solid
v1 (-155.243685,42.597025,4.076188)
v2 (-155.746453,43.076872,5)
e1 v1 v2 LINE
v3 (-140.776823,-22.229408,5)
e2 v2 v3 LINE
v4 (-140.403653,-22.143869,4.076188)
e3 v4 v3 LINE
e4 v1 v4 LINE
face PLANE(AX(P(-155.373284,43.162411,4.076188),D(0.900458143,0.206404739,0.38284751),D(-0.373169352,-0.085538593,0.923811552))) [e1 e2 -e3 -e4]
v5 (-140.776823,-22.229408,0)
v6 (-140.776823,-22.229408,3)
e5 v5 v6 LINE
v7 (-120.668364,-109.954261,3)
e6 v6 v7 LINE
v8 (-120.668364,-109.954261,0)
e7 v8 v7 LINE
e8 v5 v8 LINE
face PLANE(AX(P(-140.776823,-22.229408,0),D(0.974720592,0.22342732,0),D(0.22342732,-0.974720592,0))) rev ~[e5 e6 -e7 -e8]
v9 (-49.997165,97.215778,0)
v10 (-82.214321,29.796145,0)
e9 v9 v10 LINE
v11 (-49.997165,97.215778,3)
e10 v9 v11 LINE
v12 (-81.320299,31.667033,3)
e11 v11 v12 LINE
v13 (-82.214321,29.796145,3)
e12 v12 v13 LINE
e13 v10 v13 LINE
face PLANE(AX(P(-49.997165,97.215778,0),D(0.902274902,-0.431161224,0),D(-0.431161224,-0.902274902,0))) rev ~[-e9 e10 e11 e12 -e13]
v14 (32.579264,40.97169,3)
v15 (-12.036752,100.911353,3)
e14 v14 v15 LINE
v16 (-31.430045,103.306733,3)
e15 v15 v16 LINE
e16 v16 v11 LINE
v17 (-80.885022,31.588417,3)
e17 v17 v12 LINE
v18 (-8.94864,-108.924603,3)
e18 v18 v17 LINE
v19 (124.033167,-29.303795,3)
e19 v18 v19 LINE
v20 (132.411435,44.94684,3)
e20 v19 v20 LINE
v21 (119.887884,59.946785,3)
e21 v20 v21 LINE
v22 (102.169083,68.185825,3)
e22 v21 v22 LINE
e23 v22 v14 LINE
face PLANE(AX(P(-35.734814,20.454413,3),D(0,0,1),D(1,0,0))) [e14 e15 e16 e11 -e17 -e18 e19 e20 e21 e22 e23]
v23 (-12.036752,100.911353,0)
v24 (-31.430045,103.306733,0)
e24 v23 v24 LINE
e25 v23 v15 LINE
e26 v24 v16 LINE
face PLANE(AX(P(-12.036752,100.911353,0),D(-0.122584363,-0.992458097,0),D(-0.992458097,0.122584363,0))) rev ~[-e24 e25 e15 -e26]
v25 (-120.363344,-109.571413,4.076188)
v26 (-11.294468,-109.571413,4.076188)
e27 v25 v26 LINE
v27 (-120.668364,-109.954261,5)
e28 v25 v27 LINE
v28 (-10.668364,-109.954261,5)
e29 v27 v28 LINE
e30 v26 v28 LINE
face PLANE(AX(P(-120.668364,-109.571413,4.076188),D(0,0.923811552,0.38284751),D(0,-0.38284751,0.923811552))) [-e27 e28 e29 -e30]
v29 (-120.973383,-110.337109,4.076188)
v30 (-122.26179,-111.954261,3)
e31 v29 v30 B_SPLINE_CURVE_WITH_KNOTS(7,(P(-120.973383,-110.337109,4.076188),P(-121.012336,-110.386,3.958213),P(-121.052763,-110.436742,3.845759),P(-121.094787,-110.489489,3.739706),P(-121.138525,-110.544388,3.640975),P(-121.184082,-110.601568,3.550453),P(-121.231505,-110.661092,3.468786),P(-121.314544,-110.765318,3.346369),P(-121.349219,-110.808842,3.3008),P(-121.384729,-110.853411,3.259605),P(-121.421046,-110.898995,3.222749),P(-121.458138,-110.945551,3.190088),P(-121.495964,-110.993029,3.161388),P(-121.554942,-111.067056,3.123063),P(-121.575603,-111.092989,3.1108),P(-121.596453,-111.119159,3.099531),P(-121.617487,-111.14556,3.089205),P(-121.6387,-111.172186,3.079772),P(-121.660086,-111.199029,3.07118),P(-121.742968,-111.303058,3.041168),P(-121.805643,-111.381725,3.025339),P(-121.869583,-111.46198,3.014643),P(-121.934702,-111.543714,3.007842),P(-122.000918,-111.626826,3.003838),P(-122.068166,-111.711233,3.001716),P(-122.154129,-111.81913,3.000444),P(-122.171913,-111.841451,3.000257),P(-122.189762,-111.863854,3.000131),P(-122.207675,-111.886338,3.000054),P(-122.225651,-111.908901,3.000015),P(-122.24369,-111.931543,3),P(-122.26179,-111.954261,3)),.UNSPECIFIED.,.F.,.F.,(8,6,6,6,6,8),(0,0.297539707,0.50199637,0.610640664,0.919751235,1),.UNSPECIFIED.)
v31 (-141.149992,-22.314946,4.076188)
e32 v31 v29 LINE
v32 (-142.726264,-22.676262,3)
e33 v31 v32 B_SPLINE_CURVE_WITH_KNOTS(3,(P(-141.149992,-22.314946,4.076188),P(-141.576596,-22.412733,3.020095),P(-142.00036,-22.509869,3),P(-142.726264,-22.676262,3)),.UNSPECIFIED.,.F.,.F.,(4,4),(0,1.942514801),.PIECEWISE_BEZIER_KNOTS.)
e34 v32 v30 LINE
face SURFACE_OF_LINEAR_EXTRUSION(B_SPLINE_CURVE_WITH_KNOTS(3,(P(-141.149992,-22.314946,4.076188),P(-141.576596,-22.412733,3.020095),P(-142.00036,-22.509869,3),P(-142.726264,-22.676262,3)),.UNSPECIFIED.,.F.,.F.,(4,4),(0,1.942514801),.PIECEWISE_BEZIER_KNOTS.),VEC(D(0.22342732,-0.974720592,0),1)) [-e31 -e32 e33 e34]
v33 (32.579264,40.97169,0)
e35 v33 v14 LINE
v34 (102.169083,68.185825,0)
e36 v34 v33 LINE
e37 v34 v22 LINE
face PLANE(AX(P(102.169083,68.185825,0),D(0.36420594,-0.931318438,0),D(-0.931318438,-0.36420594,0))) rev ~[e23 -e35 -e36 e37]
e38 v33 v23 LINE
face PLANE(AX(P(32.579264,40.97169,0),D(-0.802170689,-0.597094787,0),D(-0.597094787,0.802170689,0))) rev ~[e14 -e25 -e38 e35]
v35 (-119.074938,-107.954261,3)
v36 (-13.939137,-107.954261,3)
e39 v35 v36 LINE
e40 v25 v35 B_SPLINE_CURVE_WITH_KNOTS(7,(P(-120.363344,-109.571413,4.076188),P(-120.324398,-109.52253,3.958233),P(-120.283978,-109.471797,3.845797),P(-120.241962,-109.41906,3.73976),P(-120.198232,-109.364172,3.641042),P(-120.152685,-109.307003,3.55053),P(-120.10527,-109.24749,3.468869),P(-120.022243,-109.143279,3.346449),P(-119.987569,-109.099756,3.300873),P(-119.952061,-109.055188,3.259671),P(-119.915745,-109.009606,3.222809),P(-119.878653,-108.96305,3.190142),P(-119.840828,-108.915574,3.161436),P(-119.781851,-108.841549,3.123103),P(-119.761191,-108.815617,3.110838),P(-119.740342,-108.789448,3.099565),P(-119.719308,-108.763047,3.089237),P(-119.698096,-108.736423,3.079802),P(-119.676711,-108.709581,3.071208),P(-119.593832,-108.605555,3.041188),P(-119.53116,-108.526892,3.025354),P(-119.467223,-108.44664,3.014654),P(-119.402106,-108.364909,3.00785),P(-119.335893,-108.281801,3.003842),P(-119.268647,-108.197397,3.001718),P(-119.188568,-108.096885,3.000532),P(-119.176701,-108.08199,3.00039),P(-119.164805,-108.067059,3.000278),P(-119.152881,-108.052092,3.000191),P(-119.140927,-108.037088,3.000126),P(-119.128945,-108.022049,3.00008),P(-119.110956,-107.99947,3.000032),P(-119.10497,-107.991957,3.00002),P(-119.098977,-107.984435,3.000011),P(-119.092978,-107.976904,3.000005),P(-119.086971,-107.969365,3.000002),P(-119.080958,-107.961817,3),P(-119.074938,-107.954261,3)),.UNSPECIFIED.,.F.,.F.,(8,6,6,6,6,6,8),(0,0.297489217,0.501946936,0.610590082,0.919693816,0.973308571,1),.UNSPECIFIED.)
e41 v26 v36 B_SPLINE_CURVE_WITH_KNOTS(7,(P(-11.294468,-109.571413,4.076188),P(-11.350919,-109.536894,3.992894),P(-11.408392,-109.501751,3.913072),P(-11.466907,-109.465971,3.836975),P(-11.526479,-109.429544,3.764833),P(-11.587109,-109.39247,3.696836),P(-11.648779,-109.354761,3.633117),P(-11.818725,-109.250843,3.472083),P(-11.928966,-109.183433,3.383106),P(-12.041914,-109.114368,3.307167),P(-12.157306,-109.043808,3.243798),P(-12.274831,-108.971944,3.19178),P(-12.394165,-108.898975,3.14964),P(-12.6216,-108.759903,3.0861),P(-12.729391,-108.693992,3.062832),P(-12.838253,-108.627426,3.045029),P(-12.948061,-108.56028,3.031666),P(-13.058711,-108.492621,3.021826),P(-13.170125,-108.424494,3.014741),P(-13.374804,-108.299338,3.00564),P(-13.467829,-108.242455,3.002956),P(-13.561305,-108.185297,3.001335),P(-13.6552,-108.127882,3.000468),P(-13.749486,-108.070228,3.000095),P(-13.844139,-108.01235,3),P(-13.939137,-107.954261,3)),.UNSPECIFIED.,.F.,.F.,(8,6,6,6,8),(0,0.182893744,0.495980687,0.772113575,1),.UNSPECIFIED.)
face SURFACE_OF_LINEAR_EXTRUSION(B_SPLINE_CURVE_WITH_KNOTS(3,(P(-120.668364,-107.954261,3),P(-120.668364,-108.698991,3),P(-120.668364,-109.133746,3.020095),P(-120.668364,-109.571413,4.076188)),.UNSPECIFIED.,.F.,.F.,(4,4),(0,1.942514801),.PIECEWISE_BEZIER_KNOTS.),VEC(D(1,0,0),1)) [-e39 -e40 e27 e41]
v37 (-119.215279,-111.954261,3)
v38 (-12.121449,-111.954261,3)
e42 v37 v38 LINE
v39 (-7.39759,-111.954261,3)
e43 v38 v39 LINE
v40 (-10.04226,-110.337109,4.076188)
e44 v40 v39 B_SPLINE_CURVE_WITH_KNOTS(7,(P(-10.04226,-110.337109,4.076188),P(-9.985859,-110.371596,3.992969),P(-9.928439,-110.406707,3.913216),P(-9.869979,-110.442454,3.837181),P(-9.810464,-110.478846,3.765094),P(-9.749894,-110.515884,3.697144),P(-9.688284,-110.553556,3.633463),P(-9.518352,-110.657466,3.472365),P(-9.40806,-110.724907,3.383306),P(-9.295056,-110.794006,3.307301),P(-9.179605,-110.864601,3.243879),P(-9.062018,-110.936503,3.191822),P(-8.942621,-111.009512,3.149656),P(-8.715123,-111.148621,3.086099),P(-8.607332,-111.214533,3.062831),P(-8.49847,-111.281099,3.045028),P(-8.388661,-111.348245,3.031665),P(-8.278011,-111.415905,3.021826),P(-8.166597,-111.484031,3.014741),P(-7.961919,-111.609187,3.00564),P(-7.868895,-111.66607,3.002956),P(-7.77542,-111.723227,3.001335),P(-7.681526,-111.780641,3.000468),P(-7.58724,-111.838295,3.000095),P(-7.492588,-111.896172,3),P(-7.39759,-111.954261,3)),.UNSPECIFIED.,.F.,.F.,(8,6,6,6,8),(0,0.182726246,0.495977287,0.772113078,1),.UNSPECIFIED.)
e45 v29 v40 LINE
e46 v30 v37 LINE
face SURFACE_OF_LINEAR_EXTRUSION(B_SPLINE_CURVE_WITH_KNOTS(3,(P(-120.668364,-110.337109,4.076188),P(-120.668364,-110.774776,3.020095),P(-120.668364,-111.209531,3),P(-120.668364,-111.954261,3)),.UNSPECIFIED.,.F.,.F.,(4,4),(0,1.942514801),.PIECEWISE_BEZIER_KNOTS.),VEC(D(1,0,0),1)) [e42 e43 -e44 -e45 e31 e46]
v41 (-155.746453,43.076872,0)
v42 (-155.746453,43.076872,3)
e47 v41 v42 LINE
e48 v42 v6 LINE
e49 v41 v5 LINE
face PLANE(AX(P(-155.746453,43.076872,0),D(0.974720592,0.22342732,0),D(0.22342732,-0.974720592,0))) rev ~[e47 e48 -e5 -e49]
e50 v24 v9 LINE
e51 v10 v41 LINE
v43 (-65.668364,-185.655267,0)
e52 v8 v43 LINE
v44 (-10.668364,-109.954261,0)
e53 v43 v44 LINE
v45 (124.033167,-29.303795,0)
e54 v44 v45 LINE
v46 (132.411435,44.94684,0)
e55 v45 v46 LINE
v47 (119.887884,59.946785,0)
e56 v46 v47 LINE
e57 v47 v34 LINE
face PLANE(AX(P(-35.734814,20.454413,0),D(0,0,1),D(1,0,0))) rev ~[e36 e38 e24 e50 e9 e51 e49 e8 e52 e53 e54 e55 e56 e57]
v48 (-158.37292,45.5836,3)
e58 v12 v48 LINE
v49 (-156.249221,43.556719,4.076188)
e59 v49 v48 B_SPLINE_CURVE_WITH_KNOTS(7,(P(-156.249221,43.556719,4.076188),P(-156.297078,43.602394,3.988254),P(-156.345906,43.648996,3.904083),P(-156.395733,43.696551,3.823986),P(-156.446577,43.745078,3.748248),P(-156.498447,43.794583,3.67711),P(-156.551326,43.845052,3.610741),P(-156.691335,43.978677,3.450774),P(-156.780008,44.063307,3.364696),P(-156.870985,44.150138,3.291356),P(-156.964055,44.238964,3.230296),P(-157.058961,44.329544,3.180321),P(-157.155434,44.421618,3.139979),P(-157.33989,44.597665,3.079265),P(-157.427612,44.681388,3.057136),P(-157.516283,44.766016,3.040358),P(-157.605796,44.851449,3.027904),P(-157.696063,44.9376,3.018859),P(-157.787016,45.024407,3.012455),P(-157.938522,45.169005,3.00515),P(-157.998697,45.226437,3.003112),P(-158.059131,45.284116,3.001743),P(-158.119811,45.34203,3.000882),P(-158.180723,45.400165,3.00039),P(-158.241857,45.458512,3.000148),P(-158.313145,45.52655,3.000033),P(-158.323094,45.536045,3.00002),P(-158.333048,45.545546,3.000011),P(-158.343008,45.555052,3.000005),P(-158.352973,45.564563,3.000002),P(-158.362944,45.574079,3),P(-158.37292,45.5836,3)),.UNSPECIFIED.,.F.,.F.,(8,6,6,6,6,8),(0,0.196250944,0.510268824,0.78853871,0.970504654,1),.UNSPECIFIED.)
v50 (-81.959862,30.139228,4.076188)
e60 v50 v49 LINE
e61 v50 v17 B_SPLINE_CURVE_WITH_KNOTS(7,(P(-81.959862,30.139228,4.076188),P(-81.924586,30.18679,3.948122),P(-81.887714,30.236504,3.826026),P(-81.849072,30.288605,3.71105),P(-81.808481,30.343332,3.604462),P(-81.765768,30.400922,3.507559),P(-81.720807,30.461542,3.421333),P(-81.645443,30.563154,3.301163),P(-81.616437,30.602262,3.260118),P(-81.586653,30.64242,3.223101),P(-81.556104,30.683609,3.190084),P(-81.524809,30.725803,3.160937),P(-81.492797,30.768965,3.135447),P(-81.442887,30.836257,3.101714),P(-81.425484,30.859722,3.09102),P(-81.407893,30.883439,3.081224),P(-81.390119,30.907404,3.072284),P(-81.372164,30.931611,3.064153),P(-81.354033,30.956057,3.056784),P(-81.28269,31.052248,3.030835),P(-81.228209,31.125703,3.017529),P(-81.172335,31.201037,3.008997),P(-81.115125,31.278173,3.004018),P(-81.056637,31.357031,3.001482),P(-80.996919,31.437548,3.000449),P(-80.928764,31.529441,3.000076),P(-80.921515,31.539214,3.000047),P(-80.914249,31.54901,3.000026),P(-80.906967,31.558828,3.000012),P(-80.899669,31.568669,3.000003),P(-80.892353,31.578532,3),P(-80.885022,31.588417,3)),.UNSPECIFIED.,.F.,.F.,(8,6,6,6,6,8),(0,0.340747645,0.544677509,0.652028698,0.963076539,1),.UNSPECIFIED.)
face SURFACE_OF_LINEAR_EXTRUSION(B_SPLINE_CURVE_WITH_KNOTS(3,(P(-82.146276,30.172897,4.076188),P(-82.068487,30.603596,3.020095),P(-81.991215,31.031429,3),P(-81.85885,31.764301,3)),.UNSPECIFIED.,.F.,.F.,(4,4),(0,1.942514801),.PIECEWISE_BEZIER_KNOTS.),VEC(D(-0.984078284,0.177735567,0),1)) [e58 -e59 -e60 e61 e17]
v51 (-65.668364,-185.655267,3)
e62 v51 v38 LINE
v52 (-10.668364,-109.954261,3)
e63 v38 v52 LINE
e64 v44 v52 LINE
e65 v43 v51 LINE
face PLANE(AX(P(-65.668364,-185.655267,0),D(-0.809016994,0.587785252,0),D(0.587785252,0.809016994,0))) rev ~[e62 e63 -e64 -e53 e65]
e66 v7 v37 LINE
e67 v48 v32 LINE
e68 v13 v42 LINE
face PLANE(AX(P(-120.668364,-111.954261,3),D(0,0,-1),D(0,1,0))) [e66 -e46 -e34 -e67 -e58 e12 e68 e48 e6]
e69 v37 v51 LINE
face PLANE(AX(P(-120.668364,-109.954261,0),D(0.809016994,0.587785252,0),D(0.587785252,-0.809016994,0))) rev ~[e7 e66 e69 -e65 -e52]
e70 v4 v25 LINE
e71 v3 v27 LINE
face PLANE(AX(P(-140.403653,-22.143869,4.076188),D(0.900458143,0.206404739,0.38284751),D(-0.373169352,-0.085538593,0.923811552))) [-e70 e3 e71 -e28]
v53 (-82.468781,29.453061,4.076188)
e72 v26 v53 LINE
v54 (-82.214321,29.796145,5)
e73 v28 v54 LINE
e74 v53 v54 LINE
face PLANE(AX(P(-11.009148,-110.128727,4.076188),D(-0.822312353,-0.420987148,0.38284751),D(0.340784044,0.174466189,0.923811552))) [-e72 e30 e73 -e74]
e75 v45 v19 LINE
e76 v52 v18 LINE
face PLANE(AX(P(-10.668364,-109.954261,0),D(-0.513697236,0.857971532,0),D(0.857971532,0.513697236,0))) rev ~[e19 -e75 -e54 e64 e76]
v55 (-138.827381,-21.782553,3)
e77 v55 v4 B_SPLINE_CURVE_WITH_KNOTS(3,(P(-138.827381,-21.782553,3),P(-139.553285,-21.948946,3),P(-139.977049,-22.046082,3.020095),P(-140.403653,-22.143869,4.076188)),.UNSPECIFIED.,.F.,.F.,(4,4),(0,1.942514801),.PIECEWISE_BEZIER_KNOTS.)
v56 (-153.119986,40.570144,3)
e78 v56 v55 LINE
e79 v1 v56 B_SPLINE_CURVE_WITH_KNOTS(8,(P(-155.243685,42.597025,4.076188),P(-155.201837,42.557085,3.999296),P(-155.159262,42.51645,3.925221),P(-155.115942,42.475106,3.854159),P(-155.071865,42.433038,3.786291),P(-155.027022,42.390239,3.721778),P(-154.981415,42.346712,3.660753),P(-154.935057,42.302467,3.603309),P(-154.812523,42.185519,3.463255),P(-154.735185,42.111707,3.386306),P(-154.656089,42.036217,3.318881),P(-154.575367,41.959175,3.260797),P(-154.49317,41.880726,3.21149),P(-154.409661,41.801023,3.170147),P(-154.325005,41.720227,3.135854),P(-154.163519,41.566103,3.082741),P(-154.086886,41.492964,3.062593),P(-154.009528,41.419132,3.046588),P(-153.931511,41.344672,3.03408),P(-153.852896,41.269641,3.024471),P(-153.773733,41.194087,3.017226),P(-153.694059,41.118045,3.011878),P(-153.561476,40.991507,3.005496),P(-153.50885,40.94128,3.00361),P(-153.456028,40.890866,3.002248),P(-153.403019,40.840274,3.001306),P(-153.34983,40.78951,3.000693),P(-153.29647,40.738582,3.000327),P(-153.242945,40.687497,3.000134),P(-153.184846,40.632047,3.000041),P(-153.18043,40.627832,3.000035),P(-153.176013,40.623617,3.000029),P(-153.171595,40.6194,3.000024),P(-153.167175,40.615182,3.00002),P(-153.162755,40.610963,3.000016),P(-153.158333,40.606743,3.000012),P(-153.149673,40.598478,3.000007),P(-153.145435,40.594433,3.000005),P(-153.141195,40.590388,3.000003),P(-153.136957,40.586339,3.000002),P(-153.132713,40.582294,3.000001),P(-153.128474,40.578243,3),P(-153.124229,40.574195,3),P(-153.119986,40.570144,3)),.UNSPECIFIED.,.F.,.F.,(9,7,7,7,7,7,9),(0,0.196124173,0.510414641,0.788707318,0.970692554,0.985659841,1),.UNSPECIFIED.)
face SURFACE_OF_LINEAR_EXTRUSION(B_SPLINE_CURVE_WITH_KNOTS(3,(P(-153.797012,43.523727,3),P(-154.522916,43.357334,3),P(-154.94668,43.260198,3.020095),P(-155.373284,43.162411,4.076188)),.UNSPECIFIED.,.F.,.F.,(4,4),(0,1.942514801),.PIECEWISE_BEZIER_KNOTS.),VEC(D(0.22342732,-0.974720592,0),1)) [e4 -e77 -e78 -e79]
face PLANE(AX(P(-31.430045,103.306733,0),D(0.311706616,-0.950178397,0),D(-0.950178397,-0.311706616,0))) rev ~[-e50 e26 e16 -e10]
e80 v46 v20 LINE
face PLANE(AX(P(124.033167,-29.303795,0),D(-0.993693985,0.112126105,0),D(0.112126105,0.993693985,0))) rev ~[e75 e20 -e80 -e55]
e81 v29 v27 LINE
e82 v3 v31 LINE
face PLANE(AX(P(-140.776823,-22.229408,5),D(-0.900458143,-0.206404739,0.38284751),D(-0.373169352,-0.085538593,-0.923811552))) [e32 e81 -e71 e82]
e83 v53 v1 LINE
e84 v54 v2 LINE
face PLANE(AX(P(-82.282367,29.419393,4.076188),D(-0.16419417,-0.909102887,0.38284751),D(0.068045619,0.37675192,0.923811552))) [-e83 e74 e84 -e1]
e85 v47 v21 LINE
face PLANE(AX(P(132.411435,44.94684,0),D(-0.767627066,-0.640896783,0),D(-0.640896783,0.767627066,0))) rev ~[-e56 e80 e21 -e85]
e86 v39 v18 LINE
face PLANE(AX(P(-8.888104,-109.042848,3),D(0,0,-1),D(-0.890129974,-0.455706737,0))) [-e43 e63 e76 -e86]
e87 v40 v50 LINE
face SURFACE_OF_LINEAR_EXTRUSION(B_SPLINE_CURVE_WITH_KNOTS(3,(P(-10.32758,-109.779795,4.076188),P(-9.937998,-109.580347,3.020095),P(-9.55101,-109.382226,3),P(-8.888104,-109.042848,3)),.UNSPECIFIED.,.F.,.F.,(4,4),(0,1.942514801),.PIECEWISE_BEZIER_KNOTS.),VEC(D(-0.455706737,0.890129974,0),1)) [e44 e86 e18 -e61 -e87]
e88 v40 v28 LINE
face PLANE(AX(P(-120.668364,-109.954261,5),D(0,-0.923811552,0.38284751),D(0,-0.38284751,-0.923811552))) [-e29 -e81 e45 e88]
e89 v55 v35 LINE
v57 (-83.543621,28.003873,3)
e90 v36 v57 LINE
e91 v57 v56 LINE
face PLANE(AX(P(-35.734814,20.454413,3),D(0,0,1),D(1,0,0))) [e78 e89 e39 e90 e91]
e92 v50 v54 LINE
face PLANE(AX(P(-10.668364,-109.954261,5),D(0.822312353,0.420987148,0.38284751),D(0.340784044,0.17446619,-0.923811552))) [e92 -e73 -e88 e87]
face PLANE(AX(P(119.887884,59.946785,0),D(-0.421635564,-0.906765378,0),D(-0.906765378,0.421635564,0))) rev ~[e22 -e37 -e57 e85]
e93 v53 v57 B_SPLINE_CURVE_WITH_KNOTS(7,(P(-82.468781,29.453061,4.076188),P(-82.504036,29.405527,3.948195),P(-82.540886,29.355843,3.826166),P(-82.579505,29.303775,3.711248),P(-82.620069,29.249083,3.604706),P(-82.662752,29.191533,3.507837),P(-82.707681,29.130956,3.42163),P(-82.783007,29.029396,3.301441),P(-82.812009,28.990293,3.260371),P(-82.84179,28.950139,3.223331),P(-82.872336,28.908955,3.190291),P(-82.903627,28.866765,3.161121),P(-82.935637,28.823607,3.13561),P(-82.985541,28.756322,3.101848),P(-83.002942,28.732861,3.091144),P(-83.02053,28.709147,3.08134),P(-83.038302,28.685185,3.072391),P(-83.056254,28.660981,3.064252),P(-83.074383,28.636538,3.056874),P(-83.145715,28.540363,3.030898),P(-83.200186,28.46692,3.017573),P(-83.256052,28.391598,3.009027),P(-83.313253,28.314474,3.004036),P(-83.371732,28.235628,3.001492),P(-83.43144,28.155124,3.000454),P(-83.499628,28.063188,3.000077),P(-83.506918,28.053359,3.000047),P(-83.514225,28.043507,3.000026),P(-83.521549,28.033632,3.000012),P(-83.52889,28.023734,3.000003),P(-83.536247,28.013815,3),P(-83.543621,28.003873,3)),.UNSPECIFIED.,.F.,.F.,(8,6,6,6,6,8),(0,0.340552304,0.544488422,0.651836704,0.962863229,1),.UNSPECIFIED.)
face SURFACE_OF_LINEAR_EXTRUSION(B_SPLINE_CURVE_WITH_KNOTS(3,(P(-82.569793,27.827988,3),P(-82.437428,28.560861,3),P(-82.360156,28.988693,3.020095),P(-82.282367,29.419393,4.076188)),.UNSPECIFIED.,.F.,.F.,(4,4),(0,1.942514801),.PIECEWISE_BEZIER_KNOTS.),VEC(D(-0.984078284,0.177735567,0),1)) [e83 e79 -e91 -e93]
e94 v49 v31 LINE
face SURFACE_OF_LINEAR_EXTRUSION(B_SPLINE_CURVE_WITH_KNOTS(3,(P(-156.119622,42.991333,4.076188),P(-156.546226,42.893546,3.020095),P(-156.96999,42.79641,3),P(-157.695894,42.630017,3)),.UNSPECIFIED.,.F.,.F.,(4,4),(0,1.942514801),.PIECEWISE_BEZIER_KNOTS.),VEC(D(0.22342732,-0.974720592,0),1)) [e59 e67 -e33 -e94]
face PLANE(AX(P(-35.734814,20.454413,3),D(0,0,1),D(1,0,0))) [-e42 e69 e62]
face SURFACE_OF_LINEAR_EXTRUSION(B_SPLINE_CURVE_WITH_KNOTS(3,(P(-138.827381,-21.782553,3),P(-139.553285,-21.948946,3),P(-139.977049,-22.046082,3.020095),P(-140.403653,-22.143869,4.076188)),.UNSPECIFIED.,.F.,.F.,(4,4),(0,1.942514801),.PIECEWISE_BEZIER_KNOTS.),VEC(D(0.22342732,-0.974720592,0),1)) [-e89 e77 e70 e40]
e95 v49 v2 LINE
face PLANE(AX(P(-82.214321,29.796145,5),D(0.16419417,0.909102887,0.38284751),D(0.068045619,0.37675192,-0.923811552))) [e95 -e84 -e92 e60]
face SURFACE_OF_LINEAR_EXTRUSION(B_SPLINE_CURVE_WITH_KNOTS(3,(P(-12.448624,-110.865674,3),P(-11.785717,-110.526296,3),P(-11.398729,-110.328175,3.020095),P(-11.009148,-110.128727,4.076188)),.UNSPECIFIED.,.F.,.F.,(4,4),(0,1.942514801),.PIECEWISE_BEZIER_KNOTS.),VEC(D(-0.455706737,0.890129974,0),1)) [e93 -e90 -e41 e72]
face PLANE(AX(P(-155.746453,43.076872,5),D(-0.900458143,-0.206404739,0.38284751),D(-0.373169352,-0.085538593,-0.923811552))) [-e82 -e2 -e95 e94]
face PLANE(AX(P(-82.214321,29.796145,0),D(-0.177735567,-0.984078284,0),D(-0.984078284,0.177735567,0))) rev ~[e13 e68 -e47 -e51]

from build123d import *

# Parameters (mm, degrees)
F1_DEPTH = 3


# Not quite as in the source:
# - a feature names something its author has since deleted; it is built from what else it names


with BuildPart() as f1:
    # F0 (on Top) → F1 (new body)
    with BuildSketch(Plane.XY):
        Polygon((-28.4502197635, 72.6983953348), (-51.6819700906, -29.8425633773), (-23.1152368132, 17.8982210566), align=None)
        Polygon((-140.7768225768, -22.2294077159), (-10.6683637709, -109.9542610041), (-51.6819700906, -29.8425633773), align=None)
        Polygon((-51.6819700906, -29.8425633773), (-10.6683637709, -109.9542610041), (-23.1152368132, 17.8982210566), align=None)
        Polygon((-10.6683637709, -109.9542610041), (-120.6683637709, -109.9542610041), (-65.6683637709, -185.6552666301), align=None)
        Polygon((132.4114346114, 44.946839524), (66.5490740882, -63.721509729), (124.0331667167, -29.3037948908), align=None)
        Polygon((-140.7768225768, -22.2294077159), (-120.6683637709, -109.9542610041), (-10.6683637709, -109.9542610041), align=None)
        Polygon((-155.7464530213, 43.0768719543), (-140.7768225768, -22.2294077159), (-51.6819700906, -29.8425633773), align=None)
        Polygon((-155.7464530213, 43.0768719543), (-51.6819700906, -29.8425633773), (-82.214321462, 29.796144856), align=None)
        Polygon((-82.214321462, 29.796144856), (-51.6819700906, -29.8425633773), (-49.9971651586, 97.2157779285), align=None)
        Polygon((67.6016469638, -8.0965797169), (-10.6683637709, -109.9542610041), (66.5490740882, -63.721509729), align=None)
        Polygon((-31.4300453332, 103.3067331799), (-49.9971651586, 97.2157779285), (-28.4502197635, 72.6983953348), align=None)
        Polygon((-31.4300453332, 103.3067331799), (-28.4502197635, 72.6983953348), (-12.0367519986, 100.9113529511), align=None)
        Polygon((-12.0367519508, 100.9113529867), (14.1232700197, -23.4361999186), (32.5792640638, 40.9716900005), align=None)
        Polygon((119.8878838282, 59.9467845327), (101.1497655445, 35.5616942262), (132.4114345522, 44.9468395307), align=None)
        Polygon((102.1690833879, 68.1858247536), (101.1497655445, 35.5616942262), (119.8878838282, 59.9467845327), align=None)
        Polygon((32.5792640638, 40.9716900005), (14.1232700197, -23.4361999186), (102.1690833662, 68.185824809), align=None)
        Polygon((-49.9971651586, 97.2157779285), (-51.6819700906, -29.8425633773), (-28.4502197635, 72.6983953348), align=None)
        Polygon((-28.4502197635, 72.6983953348), (-23.1152368132, 17.8982210566), (14.1232700197, -23.4361999186), align=None)
        Polygon((-23.1152368132, 17.8982210566), (-10.6683637709, -109.9542610041), (14.1232700197, -23.4361999186), align=None)
        Polygon((-28.4502197635, 72.6983953348), (14.1232700197, -23.4361999186), (-12.0367519508, 100.9113529867), align=None)
        Polygon((14.1232700197, -23.4361999186), (-10.6683637709, -109.9542610041), (67.6016469638, -8.0965797169), align=None)
        Polygon((102.1690833662, 68.185824809), (14.1232700197, -23.4361999186), (101.1497655445, 35.5616942262), align=None)
        Polygon((101.1497655445, 35.5616942262), (66.5490740882, -63.721509729), (132.4114346114, 44.946839524), align=None)
        Polygon((67.6016469638, -8.0965797169), (66.5490740882, -63.721509729), (101.1497655445, 35.5616942262), align=None)
        Polygon((101.1497655445, 35.5616942262), (14.1232700197, -23.4361999186), (67.6016469638, -8.0965797169), align=None)
    extrude(amount=F1_DEPTH)

    # F6: sweep along a path in F2
    with BuildLine(Plane.XY.offset(3)) as f6_path:
        Line((-10.6683637709, -109.9542610041), (-51.6819700906, -29.8425633773))
        Line((-51.6819700906, -29.8425633773), (-82.214321462, 29.796144856))
        Line((-82.214321462, 29.796144856), (-155.7464530213, 43.0768719543))
        Line((-155.7464530213, 43.0768719543), (-140.7768225768, -22.2294077159))
        Line((-140.7768225768, -22.2294077159), (-120.6683637709, -109.9542610041))
        Line((-120.6683637709, -109.9542610041), (-10.6683637709, -109.9542610041))
    # F5 (on plane+point) → F6 (sweep)
    with BuildSketch(Plane.YZ.offset(-120.6683637709)):
        with BuildLine():
            Line((-111.9542610041, 3), (-107.9542610041, 3))
            add(Edge.make_bspline(
                [(-107.9542610041, 3), (-108.6989912072, 3), (-109.1337455213, 3.0200950451), (-109.5714134942, 4.0761884477)],
                knots=[0, 0, 0, 0, 1.9425148007, 1.9425148007, 1.9425148007, 1.9425148007], degree=3))
            Line((-109.5714134942, 4.0761884477), (-109.9542610041, 5))
            Line((-109.9542610041, 5), (-110.3371085141, 4.0761884477))
            add(Edge.make_bspline(
                [(-111.9542610041, 3), (-111.2095308011, 3), (-110.774776487, 3.0200950451), (-110.3371085141, 4.0761884477)],
                knots=[0, 0, 0, 0, 1.9425148007, 1.9425148007, 1.9425148007, 1.9425148007], degree=3))
        make_face()
    sweep(path=f6_path.line, transition=Transition.RIGHT)


solid = f1.part
